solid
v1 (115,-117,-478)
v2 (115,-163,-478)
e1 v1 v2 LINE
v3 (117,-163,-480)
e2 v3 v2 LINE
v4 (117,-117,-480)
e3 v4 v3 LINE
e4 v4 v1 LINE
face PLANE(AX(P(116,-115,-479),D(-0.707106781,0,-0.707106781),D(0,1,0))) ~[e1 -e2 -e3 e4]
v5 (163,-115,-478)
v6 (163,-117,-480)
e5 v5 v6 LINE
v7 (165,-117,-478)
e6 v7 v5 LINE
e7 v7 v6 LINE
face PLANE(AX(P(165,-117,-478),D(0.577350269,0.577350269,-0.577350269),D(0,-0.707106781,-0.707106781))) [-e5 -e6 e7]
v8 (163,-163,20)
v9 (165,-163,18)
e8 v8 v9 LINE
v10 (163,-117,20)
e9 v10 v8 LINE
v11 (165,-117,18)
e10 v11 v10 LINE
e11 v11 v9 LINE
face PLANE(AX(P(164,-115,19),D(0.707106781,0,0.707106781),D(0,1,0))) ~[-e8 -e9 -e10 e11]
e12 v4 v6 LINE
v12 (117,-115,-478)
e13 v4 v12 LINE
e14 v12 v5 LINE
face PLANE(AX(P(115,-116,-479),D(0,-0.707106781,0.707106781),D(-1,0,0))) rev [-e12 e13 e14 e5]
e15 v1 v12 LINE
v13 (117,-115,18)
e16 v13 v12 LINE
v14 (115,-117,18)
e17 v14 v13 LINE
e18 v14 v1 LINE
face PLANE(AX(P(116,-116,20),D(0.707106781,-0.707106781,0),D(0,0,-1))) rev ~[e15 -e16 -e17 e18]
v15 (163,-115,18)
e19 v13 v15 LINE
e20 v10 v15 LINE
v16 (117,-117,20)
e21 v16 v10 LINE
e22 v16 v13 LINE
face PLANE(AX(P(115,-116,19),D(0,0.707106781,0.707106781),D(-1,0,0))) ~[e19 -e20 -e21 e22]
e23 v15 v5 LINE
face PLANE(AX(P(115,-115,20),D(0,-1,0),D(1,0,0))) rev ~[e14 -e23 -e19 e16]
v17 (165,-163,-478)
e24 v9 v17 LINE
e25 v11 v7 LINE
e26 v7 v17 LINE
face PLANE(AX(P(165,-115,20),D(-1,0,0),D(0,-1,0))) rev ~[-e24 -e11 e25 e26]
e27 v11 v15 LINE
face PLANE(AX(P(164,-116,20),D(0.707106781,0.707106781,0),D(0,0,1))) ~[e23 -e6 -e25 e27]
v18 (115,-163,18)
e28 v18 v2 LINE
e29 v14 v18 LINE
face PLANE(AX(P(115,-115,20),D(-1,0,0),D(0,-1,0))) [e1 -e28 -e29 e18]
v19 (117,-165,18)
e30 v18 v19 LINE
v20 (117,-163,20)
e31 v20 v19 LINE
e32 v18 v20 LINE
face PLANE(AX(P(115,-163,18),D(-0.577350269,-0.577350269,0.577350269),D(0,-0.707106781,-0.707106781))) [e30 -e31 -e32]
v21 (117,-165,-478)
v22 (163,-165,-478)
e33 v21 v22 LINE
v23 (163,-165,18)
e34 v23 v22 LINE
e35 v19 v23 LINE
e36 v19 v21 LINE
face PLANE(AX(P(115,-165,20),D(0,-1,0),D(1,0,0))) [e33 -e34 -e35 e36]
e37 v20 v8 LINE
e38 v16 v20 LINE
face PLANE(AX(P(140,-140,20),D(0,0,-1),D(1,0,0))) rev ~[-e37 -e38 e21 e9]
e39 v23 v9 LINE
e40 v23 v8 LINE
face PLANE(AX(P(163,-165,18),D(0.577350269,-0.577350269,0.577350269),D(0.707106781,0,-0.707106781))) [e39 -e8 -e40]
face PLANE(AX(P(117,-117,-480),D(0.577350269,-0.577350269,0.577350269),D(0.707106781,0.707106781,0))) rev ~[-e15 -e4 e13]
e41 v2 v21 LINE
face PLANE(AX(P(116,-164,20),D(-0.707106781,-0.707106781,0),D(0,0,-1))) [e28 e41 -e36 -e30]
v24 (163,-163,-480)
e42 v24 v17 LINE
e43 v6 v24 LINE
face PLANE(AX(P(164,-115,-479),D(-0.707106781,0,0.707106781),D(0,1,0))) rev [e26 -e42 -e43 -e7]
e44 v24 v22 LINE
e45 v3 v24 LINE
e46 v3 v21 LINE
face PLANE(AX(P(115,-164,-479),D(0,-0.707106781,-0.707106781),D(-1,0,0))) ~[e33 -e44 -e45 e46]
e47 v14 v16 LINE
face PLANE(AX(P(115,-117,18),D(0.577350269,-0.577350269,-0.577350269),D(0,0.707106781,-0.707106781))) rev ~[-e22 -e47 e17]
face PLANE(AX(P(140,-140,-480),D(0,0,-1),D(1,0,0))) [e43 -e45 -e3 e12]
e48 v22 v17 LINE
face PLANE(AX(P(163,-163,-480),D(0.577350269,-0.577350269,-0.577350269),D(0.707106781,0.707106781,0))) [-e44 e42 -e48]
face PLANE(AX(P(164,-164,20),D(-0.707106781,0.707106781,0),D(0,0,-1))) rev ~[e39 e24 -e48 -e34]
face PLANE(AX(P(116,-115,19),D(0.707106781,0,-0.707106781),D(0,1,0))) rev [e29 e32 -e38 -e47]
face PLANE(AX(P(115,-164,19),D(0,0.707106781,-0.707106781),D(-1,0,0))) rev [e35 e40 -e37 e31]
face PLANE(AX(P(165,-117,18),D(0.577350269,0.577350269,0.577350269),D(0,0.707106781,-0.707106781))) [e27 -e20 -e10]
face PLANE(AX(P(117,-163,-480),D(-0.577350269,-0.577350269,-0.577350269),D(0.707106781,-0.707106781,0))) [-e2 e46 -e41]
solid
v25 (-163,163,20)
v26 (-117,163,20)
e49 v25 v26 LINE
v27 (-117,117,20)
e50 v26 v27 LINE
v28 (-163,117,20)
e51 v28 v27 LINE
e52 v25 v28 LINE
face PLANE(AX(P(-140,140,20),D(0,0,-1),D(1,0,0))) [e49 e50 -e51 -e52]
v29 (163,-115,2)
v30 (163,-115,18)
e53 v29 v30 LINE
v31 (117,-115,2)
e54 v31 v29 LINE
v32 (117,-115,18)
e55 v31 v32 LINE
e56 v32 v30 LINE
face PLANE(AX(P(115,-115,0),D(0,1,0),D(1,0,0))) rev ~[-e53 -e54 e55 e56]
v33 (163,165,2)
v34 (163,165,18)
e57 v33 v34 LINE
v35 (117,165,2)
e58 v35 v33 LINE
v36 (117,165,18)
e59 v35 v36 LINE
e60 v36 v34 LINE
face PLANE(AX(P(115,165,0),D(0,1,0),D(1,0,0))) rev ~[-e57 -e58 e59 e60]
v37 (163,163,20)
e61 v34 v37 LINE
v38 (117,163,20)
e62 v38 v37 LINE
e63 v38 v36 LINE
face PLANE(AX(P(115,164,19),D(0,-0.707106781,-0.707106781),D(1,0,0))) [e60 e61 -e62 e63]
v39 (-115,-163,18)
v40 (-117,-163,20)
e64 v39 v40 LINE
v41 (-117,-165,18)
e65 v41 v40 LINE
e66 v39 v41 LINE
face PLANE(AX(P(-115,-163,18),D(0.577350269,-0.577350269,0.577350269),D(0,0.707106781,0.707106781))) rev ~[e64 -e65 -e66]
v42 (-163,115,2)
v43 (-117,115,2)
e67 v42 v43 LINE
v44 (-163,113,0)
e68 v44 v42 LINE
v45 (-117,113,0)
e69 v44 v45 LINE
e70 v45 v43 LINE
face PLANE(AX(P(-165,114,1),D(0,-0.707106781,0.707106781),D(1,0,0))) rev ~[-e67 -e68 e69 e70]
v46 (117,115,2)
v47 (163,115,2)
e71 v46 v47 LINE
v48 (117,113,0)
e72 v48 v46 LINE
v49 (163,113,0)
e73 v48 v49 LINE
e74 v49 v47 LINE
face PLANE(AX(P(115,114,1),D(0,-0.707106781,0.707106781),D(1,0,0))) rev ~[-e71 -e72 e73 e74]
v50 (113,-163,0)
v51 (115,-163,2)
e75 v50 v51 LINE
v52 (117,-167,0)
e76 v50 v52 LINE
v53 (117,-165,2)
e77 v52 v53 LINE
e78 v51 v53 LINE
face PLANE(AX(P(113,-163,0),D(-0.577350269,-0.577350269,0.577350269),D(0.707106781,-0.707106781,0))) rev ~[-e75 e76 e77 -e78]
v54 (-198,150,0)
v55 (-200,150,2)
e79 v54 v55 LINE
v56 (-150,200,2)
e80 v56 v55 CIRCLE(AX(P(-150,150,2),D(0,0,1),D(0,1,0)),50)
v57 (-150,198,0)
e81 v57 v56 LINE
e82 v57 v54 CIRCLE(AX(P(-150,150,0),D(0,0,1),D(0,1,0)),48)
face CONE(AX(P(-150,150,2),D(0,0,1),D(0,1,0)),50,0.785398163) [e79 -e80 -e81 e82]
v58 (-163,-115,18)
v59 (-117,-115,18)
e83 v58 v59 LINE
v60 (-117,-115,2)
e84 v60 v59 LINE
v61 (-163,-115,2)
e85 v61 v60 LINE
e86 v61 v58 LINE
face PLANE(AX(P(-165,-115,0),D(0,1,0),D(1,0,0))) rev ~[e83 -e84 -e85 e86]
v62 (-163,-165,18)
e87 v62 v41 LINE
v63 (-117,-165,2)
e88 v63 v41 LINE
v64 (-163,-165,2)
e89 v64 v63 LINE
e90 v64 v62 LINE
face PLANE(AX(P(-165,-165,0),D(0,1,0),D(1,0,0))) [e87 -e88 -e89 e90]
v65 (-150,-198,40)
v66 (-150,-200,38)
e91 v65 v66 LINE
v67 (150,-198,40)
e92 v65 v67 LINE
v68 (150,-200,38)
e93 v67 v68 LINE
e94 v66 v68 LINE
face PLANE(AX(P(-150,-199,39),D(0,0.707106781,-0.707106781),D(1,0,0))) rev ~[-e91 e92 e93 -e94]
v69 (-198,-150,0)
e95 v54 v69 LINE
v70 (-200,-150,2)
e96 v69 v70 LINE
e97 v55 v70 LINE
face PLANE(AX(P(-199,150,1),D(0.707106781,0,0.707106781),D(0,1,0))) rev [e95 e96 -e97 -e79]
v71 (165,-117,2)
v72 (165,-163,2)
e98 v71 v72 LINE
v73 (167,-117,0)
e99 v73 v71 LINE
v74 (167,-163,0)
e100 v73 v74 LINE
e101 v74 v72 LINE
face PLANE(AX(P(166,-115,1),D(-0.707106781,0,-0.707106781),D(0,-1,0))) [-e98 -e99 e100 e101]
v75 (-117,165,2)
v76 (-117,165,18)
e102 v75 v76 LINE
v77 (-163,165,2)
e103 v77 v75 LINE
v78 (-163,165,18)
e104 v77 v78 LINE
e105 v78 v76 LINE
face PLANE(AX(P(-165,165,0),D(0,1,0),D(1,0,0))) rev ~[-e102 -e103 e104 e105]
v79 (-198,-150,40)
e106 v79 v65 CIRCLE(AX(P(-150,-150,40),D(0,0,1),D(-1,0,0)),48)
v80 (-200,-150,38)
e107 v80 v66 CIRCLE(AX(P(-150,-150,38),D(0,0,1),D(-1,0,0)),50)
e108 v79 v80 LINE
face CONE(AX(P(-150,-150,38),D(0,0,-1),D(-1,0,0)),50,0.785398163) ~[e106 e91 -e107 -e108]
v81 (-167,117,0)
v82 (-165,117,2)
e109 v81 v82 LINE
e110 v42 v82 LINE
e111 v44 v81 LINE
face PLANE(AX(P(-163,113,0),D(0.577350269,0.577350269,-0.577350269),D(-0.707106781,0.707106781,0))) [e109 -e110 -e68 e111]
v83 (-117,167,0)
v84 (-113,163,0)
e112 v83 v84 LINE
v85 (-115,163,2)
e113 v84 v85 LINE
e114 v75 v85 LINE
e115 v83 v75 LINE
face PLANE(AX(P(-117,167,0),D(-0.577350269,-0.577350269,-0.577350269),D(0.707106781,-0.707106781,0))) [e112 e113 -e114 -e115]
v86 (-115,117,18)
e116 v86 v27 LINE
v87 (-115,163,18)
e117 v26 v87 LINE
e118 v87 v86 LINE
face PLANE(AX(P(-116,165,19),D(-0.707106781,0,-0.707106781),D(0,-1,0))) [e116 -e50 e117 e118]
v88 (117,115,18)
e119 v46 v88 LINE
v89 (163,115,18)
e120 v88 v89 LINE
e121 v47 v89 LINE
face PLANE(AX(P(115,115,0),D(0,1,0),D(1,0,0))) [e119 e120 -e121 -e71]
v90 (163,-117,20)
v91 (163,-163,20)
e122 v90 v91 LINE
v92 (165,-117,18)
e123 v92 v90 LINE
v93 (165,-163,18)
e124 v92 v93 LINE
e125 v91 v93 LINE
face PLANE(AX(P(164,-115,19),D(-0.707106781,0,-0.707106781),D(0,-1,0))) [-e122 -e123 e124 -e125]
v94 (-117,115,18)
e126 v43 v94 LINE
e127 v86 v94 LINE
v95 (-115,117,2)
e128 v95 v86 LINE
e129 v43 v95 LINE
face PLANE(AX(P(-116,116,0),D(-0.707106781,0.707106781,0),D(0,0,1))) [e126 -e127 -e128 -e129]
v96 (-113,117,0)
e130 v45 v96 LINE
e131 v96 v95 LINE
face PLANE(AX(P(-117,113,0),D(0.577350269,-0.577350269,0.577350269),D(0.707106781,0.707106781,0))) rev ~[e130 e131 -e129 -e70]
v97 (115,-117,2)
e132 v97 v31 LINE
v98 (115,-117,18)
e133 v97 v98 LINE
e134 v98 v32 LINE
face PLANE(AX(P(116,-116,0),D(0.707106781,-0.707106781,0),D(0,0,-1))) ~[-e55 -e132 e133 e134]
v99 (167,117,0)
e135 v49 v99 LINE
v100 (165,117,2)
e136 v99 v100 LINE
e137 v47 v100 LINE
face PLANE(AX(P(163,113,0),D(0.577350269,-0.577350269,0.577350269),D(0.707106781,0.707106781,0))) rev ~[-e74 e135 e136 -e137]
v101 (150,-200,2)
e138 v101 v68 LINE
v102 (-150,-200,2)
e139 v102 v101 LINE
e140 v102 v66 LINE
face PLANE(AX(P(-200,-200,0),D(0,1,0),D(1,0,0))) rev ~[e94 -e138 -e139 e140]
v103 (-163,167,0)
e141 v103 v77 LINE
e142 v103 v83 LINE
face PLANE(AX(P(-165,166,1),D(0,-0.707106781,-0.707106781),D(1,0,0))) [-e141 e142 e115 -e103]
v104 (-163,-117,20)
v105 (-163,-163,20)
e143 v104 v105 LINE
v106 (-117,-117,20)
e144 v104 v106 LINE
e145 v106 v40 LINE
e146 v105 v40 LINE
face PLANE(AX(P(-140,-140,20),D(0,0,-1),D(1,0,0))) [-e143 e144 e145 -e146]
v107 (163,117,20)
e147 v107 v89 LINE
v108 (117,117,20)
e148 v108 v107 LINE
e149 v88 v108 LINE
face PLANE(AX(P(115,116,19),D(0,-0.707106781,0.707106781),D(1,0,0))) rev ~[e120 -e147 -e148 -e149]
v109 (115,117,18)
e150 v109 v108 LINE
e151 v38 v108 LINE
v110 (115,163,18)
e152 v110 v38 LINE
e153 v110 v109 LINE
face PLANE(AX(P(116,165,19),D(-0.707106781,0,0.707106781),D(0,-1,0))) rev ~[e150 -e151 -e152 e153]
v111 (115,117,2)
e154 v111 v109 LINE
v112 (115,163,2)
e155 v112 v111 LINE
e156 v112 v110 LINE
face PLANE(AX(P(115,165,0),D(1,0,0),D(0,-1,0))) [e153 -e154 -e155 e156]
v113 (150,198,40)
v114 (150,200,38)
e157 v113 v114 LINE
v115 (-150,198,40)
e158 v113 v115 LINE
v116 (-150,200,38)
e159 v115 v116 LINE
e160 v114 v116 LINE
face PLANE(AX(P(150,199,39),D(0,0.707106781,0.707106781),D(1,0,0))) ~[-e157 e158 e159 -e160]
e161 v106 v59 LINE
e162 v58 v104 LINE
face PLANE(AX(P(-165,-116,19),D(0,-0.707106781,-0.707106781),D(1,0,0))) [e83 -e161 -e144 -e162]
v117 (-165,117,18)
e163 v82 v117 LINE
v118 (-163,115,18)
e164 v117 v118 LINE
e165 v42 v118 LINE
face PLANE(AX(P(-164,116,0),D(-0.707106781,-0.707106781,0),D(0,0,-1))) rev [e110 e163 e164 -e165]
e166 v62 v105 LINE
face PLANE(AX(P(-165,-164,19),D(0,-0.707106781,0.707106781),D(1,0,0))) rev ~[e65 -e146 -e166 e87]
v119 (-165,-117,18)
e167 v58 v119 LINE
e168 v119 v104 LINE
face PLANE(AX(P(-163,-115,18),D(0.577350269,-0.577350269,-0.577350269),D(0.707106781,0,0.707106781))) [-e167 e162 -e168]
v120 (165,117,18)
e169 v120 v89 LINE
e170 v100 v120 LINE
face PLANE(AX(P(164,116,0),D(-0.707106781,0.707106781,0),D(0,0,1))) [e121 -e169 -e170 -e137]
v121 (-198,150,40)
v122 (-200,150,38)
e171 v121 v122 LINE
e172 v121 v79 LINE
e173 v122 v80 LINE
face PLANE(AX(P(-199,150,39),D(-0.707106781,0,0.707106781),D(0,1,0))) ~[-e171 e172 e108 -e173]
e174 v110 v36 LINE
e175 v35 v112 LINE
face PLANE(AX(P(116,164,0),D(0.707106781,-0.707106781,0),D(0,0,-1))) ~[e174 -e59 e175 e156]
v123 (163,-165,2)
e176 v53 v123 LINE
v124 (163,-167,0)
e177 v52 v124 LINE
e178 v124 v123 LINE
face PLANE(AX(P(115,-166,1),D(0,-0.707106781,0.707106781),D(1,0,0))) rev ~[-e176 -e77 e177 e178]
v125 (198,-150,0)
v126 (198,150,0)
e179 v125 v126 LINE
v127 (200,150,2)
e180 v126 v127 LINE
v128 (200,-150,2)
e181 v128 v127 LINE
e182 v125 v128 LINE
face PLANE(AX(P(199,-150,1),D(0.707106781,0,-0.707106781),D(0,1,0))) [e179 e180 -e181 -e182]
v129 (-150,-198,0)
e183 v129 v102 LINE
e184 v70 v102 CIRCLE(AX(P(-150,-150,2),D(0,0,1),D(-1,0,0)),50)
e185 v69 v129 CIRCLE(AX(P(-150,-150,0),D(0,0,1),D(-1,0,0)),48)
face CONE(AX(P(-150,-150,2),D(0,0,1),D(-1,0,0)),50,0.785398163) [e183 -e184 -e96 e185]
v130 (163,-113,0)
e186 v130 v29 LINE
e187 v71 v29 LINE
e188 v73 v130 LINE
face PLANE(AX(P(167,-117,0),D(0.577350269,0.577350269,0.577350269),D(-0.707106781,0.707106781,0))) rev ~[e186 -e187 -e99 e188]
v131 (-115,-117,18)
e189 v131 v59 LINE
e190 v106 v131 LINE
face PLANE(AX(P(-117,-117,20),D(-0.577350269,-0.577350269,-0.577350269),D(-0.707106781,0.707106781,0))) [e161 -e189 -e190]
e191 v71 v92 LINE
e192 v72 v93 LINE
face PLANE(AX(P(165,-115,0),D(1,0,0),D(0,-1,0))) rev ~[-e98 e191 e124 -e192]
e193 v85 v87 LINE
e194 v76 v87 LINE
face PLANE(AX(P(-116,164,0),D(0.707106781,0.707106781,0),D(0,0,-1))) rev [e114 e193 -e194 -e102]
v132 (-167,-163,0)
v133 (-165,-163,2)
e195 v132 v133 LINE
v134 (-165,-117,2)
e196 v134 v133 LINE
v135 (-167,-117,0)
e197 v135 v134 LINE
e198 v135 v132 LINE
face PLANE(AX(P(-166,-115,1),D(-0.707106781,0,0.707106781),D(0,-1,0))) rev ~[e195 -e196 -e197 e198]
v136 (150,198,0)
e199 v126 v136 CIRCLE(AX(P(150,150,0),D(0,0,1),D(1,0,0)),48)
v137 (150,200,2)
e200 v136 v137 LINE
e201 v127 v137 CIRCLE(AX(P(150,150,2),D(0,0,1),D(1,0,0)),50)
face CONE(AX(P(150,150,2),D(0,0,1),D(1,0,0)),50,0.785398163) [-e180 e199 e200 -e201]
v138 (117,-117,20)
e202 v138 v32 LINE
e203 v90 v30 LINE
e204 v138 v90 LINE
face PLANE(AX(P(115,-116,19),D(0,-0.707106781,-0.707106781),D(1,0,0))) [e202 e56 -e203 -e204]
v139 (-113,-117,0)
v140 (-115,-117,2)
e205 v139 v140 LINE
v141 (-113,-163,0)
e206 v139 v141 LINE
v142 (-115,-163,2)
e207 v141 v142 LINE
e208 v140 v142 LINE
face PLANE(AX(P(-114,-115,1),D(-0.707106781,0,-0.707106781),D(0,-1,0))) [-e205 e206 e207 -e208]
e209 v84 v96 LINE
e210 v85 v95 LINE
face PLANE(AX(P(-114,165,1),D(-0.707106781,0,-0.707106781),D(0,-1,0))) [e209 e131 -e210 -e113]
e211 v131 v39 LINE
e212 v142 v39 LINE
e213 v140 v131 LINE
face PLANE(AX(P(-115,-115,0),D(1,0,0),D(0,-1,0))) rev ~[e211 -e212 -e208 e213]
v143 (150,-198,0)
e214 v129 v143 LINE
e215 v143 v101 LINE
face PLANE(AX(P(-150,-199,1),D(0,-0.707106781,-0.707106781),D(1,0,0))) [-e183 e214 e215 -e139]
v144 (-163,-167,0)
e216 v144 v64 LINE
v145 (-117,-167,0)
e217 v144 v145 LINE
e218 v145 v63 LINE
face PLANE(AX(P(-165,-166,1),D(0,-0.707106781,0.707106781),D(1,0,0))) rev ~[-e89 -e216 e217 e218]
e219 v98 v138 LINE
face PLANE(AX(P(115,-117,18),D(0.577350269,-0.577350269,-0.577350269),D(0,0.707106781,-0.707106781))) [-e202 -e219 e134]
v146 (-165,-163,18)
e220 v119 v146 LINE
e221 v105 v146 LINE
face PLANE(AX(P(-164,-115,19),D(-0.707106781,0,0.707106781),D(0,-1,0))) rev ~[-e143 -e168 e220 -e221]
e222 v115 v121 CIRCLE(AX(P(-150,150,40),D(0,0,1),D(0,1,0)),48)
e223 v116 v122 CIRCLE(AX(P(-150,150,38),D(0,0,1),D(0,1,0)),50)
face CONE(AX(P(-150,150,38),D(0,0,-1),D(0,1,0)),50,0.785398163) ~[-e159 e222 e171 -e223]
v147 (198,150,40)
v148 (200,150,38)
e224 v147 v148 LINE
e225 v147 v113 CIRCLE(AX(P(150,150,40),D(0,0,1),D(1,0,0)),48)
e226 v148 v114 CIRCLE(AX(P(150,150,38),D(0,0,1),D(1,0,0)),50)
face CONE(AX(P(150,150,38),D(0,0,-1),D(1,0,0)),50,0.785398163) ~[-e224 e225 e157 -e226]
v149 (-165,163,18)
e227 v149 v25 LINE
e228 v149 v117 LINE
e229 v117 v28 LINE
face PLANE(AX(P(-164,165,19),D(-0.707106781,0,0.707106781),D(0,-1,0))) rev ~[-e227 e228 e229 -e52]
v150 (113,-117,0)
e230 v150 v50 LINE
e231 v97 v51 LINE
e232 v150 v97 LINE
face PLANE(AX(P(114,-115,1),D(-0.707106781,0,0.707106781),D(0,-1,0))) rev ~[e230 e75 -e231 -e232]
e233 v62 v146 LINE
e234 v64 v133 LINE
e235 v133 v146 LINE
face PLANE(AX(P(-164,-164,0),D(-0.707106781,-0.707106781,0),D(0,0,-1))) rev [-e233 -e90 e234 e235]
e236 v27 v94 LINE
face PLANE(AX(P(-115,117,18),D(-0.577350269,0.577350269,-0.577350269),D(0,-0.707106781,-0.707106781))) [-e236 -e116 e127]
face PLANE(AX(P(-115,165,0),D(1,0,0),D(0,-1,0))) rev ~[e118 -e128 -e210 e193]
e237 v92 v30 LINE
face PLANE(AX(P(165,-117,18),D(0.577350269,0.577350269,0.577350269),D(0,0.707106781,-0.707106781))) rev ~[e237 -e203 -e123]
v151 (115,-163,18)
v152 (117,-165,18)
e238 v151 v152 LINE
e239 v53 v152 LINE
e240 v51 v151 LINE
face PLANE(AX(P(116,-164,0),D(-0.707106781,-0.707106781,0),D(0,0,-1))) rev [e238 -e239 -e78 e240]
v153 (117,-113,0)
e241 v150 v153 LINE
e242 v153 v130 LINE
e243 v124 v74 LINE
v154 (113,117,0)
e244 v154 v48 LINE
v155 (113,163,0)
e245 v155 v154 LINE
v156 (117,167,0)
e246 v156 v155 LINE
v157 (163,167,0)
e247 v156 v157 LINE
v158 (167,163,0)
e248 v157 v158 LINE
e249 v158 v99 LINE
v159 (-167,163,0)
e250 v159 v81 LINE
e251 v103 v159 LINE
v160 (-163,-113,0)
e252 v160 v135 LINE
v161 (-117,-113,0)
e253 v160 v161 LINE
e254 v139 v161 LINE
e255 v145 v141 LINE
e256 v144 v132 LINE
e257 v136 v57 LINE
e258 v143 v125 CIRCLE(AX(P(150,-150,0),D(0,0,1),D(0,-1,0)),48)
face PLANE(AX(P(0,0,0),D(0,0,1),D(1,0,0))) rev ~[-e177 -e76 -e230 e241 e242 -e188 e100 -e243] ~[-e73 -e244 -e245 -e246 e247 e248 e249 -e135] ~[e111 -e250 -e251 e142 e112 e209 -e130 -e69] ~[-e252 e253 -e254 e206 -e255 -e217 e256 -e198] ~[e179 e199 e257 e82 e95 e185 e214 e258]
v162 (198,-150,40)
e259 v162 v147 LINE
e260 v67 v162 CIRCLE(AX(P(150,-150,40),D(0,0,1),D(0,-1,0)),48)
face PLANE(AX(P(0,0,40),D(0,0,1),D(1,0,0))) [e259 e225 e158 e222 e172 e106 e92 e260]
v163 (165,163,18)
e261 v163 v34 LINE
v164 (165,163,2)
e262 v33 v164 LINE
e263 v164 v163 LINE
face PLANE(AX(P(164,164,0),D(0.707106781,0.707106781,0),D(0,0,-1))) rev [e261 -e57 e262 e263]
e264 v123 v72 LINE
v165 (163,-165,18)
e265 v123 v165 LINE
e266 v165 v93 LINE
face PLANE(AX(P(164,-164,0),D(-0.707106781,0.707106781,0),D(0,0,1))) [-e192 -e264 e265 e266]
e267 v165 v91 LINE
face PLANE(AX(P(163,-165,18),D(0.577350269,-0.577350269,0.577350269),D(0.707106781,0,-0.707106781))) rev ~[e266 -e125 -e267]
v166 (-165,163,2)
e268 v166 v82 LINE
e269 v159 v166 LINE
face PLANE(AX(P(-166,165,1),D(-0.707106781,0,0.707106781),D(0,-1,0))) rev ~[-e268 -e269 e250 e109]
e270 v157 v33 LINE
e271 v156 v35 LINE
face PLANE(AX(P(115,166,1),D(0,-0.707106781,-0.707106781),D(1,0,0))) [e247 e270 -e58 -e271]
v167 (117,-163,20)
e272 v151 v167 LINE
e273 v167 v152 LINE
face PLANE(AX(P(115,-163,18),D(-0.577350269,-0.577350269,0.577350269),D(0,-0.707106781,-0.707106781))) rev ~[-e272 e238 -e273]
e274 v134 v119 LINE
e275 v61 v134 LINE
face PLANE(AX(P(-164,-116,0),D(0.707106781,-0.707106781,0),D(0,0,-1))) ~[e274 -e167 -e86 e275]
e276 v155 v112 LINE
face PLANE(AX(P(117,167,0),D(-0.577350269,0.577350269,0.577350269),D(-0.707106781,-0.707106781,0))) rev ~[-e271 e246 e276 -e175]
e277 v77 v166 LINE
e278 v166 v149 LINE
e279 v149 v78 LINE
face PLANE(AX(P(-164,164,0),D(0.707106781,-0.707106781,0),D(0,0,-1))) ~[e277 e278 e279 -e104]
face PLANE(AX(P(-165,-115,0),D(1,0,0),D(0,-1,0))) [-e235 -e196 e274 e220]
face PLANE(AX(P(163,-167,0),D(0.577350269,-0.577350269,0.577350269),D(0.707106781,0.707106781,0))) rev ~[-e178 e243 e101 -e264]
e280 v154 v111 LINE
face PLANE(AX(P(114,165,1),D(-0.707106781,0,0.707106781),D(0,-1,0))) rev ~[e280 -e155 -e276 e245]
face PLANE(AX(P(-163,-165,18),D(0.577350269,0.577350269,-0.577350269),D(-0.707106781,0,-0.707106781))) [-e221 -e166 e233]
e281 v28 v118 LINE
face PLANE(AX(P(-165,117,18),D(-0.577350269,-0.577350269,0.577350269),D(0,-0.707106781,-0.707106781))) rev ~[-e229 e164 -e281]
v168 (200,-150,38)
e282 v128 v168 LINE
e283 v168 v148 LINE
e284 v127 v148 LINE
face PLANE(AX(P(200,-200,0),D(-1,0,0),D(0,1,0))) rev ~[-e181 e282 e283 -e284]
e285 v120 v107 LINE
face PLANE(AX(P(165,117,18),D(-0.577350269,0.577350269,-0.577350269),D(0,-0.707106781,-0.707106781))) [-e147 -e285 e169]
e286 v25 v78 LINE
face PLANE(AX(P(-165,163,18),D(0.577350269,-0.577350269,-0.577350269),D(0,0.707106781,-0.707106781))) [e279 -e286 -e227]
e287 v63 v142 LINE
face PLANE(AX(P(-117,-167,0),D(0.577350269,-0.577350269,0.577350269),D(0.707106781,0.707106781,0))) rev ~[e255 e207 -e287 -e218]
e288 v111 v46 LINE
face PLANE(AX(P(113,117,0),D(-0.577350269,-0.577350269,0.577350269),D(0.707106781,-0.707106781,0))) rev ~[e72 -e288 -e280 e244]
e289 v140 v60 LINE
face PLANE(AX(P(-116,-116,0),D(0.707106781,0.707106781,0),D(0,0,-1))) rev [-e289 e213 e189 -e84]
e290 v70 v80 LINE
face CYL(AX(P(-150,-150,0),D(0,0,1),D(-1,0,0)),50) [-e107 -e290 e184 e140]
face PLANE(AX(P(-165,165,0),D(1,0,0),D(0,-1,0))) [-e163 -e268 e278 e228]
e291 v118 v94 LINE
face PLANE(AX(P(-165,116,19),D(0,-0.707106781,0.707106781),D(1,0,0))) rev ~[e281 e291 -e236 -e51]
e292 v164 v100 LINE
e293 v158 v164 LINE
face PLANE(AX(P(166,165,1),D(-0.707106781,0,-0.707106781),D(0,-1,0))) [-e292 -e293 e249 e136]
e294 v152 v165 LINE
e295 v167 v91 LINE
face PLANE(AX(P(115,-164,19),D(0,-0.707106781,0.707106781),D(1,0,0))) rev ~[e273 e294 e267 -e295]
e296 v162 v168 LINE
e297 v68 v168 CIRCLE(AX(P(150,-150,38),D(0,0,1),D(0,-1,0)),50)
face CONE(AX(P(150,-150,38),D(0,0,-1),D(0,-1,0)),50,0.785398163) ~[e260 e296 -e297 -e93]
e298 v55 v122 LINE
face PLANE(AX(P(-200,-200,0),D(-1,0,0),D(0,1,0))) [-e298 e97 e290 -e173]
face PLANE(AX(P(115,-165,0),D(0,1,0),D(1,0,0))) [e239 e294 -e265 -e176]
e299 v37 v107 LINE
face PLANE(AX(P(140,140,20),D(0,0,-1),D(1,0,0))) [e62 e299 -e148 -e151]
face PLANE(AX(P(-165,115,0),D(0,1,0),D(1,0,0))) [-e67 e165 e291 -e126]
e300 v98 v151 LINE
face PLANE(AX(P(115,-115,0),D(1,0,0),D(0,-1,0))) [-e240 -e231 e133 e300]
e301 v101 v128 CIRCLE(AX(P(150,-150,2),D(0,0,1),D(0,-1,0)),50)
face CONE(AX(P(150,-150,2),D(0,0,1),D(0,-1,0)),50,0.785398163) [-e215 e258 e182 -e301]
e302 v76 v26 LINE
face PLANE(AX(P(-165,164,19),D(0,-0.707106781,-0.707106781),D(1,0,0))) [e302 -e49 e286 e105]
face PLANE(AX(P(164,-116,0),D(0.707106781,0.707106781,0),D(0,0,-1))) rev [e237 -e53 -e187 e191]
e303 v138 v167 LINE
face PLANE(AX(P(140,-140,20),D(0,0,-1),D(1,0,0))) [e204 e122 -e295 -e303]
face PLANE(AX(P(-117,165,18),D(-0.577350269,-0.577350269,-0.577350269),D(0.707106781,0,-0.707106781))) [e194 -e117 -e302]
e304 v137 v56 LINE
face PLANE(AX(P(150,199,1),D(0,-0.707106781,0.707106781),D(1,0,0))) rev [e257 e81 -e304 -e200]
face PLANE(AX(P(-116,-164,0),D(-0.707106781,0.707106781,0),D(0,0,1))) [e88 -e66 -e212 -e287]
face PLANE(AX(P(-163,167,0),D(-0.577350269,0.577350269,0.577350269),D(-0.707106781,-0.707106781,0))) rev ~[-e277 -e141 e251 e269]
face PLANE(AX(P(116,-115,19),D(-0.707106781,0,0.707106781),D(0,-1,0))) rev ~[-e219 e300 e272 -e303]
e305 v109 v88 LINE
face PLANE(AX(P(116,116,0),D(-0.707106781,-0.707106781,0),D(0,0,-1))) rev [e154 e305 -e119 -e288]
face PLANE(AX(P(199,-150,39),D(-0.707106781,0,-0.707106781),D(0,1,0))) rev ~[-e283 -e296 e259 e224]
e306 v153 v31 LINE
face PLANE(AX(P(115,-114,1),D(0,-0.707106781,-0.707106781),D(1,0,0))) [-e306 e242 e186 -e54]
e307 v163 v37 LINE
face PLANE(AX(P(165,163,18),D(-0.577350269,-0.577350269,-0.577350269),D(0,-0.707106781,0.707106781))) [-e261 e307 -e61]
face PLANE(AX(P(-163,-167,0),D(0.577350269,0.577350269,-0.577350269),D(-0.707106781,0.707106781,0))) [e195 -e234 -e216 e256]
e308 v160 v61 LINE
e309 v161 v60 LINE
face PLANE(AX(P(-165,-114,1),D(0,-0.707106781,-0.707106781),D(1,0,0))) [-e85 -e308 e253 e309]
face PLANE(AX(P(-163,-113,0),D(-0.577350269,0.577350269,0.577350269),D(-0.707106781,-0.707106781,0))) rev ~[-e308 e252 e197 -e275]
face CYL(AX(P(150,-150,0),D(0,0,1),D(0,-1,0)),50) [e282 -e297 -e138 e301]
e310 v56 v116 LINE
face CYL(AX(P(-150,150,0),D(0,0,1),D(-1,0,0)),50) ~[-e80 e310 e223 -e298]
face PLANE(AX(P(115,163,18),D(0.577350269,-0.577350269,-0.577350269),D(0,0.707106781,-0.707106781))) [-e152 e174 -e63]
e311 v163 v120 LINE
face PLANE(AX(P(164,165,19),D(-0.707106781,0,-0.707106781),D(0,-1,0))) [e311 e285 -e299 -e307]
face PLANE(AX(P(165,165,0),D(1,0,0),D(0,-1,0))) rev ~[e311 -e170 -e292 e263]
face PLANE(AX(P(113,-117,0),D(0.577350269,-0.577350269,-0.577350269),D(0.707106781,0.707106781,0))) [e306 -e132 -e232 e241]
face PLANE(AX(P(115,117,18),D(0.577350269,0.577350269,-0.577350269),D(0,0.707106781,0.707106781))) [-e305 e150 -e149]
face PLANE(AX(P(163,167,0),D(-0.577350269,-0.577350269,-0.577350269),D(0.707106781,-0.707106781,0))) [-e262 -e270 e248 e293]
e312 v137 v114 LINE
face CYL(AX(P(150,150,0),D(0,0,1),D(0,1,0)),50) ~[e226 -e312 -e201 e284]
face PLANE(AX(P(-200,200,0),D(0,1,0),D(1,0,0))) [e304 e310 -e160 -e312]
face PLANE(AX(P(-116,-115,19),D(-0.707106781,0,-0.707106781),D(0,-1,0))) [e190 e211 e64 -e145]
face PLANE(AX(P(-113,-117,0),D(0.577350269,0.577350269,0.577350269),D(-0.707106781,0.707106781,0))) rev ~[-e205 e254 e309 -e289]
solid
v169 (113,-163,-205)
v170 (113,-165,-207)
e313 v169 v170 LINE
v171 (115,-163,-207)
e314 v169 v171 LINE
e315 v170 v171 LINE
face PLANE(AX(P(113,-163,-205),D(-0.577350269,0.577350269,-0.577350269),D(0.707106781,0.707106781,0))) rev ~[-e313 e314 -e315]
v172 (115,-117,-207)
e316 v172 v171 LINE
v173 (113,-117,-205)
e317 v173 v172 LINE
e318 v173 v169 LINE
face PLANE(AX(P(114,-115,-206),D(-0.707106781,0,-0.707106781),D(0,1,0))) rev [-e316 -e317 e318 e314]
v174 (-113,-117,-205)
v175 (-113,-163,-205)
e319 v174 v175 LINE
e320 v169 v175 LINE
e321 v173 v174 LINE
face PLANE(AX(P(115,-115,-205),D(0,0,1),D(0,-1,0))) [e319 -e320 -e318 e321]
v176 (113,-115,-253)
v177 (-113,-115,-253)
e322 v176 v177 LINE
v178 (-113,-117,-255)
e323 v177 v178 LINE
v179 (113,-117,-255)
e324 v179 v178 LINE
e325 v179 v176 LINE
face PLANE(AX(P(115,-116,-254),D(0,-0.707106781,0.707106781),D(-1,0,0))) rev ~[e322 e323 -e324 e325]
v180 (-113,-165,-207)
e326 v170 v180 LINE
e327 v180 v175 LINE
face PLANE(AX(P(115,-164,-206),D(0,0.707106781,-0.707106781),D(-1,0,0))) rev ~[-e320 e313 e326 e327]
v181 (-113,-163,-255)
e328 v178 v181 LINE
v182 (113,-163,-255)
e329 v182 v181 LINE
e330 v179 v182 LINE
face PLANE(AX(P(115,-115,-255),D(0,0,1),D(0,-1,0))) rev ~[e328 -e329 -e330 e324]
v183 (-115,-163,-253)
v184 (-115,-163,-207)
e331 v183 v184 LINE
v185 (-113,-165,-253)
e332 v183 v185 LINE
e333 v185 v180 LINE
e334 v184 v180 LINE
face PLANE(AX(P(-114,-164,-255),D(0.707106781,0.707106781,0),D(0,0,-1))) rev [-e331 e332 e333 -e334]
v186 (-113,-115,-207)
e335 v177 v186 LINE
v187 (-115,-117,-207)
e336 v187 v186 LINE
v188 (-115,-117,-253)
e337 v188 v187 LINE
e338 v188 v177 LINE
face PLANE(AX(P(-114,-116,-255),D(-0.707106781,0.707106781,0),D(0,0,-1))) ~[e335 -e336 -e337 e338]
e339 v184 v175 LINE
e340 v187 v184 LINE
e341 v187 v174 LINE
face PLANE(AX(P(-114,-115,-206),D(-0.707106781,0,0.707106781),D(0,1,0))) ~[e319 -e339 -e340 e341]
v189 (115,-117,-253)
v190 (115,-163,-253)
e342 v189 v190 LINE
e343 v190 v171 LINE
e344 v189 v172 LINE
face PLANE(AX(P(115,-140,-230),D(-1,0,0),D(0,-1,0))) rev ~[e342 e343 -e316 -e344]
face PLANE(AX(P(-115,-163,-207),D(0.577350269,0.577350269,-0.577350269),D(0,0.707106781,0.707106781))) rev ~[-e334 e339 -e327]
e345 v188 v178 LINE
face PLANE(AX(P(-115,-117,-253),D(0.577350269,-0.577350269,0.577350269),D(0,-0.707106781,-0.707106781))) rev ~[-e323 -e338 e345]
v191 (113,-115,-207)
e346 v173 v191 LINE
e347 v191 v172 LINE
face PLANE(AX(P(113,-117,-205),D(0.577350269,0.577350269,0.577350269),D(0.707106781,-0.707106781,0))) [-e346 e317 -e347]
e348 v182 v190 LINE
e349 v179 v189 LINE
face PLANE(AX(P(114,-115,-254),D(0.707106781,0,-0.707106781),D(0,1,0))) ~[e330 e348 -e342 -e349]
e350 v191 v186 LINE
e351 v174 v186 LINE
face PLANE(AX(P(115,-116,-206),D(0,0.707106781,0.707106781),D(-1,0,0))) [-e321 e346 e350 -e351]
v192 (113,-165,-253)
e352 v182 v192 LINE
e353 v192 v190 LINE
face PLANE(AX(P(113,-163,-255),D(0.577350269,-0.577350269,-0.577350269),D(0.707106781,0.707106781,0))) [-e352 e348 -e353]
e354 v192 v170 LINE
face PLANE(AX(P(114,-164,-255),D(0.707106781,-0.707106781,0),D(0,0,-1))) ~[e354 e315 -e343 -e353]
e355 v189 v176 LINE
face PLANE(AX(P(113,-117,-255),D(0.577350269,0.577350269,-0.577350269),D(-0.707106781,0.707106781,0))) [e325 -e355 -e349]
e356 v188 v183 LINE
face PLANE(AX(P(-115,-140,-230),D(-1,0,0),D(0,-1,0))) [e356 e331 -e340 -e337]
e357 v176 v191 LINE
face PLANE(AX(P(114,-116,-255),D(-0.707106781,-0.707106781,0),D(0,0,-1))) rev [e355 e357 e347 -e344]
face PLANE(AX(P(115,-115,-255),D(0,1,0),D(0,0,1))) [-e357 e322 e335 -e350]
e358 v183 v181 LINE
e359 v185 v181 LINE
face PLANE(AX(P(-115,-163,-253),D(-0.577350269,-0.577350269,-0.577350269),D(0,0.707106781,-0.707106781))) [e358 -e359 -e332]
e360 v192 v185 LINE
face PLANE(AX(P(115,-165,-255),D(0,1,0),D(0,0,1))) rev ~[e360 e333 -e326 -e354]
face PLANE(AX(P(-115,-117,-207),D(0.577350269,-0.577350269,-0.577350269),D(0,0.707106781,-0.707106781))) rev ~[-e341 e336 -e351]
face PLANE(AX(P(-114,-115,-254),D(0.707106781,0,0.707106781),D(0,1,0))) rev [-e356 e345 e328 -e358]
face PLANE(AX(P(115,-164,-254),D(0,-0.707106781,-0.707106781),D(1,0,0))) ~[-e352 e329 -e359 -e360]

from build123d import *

# Parameters (mm, degrees)
F0_W      = 400
F0_H      = 400
F1_DEPTH  = 40
F2_W      = 50
F2_H      = 50
F3_DEPTH  = 20
F4_R      = 50
F5_DEPTH  = 500
F6_W      = 50
F6_H      = 50
F7_DEPTH  = 230
F8_SIZE   = 2
F8_2_SIZE = 2
F8_3_SIZE = 2


with BuildPart() as f1:
    # F0 (on Top) → F1 (new body)
    with BuildSketch(Plane.XY):
        Rectangle(F0_W, F0_H)
    extrude(amount=F1_DEPTH)

    # F2 (on face) → F3 (cut)
    with BuildSketch(Plane(origin=(0, 0, 0), x_dir=(1, 0, 0), z_dir=(0, 0, -1))):
        with Locations((140, 140)):
            Rectangle(F2_W, F2_H)
        with Locations((140, -140)):
            Rectangle(F2_W, F2_H)
        with Locations((-140, -140)):
            Rectangle(F2_W, F2_H)
        with Locations((-140, 140)):
            Rectangle(F2_W, F2_H)
    extrude(amount=-F3_DEPTH, mode=Mode.SUBTRACT)

    # F4
    f4_edges = [f1.edges().sort_by_distance(p)[0] for p in [
        (200, -200, 20),
        (200, 200, 20),
        (-200, 200, 20),
        (-200, -200, 20),
    ]]
    fillet(f4_edges, radius=F4_R)


with BuildPart() as f5:
    # F5 (new): a face of the model
    f5_faces = [f1.part.faces().sort_by_distance(p)[0] for p in [
        (140, -140, 20),
    ]]
    extrude(f5_faces, amount=F5_DEPTH)

    # F8#2
    f8_2_edges = [f5.edges().sort_by_distance(p)[0] for p in [
        (140, -115, 20),
        (165, -140, 20),
        (140, -165, 20),
        (115, -140, 20),
        (115, -165, -230),
        (115, -115, -230),
        (115, -140, -480),
        (165, -165, -230),
        (140, -165, -480),
        (140, -115, -480),
        (165, -115, -230),
        (165, -140, -480),
    ]]
    chamfer(f8_2_edges, length=F8_2_SIZE)


with BuildPart() as f7:
    # F6 (on face) → F7 (new body, through all)
    with BuildSketch(Plane(origin=(115, 0, 0), x_dir=(0, -1, 0), z_dir=(-1, 0, 0))):
        with Locations((140, -230)):
            Rectangle(F6_W, F6_H)
    extrude(amount=F7_DEPTH)

    # F8#3
    f8_3_edges = [f7.edges().sort_by_distance(p)[0] for p in [
        (115, -165, -230),
        (115, -115, -230),
        (0, -165, -205),
        (0, -115, -205),
        (115, -140, -205),
        (0, -165, -255),
        (115, -140, -255),
        (0, -115, -255),
        (-115, -165, -230),
        (-115, -140, -205),
        (-115, -115, -230),
        (-115, -140, -255),
    ]]
    chamfer(f8_3_edges, length=F8_3_SIZE)


with BuildPart() as f1_1:
    add(f1.part)

    # F8
    f8_edges = [f1_1.edges().sort_by_distance(p)[0] for p in [
        (-185.355339, -185.355339, 0),
        (185.355339, -185.355339, 40),
        (-185.355339, 185.355339, 40),
        (-185.355339, 185.355339, 0),
        (0, -200, 0),
        (0, -200, 40),
        (-200, 0, 0),
        (0, 200, 40),
        (-185.355339, -185.355339, 40),
        (-200, 0, 40),
        (200, 0, 40),
        (185.355339, 185.355339, 40),
        (150, -200, 20),
        (150, 200, 20),
        (185.355339, 185.355339, 0),
        (-200, -150, 20),
        (-140, -165, 0),
        (200, 150, 20),
        (140, 165, 20),
        (200, -150, 20),
        (-200, 150, 20),
        (200, 0, 0),
        (115, -140, 0),
        (0, 200, 0),
        (-150, 200, 20),
        (-140, 115, 20),
        (140, -115, 20),
        (-150, -200, 20),
        (185.355339, -185.355339, 0),
        (140, 115, 0),
        (-115, -140, 0),
        (140, 165, 0),
        (165, -140, 20),
        (-115, 140, 20),
        (165, 140, 0),
        (-140, 165, 0),
        (165, 165, 10),
        (140, -165, 20),
        (-165, -140, 20),
        (-165, -140, 0),
        (-165, 140, 0),
        (-140, 165, 20),
        (-165, 140, 20),
        (140, 115, 20),
        (-115, 140, 0),
        (-140, -165, 20),
        (-165, -165, 10),
        (115, -140, 20),
        (115, 115, 10),
        (-165, 115, 10),
        (-165, -115, 10),
        (165, 140, 20),
        (-115, -165, 10),
        (140, -165, 0),
        (-165, 165, 10),
        (-140, -115, 0),
        (115, 140, 20),
        (165, -140, 0),
        (-115, -115, 10),
        (115, 140, 0),
        (-115, 115, 10),
        (-140, 115, 0),
        (115, 165, 10),
        (-115, -140, 20),
        (-140, -115, 20),
        (140, -115, 0),
        (165, 115, 10),
        (-115, 165, 10),
        (165, -165, 10),
        (165, -115, 10),
        (115, -115, 10),
        (115, -165, 10),
    ]]
    chamfer(f8_edges, length=F8_SIZE)


solid = Compound([f5.part, f7.part, f1_1.part])
